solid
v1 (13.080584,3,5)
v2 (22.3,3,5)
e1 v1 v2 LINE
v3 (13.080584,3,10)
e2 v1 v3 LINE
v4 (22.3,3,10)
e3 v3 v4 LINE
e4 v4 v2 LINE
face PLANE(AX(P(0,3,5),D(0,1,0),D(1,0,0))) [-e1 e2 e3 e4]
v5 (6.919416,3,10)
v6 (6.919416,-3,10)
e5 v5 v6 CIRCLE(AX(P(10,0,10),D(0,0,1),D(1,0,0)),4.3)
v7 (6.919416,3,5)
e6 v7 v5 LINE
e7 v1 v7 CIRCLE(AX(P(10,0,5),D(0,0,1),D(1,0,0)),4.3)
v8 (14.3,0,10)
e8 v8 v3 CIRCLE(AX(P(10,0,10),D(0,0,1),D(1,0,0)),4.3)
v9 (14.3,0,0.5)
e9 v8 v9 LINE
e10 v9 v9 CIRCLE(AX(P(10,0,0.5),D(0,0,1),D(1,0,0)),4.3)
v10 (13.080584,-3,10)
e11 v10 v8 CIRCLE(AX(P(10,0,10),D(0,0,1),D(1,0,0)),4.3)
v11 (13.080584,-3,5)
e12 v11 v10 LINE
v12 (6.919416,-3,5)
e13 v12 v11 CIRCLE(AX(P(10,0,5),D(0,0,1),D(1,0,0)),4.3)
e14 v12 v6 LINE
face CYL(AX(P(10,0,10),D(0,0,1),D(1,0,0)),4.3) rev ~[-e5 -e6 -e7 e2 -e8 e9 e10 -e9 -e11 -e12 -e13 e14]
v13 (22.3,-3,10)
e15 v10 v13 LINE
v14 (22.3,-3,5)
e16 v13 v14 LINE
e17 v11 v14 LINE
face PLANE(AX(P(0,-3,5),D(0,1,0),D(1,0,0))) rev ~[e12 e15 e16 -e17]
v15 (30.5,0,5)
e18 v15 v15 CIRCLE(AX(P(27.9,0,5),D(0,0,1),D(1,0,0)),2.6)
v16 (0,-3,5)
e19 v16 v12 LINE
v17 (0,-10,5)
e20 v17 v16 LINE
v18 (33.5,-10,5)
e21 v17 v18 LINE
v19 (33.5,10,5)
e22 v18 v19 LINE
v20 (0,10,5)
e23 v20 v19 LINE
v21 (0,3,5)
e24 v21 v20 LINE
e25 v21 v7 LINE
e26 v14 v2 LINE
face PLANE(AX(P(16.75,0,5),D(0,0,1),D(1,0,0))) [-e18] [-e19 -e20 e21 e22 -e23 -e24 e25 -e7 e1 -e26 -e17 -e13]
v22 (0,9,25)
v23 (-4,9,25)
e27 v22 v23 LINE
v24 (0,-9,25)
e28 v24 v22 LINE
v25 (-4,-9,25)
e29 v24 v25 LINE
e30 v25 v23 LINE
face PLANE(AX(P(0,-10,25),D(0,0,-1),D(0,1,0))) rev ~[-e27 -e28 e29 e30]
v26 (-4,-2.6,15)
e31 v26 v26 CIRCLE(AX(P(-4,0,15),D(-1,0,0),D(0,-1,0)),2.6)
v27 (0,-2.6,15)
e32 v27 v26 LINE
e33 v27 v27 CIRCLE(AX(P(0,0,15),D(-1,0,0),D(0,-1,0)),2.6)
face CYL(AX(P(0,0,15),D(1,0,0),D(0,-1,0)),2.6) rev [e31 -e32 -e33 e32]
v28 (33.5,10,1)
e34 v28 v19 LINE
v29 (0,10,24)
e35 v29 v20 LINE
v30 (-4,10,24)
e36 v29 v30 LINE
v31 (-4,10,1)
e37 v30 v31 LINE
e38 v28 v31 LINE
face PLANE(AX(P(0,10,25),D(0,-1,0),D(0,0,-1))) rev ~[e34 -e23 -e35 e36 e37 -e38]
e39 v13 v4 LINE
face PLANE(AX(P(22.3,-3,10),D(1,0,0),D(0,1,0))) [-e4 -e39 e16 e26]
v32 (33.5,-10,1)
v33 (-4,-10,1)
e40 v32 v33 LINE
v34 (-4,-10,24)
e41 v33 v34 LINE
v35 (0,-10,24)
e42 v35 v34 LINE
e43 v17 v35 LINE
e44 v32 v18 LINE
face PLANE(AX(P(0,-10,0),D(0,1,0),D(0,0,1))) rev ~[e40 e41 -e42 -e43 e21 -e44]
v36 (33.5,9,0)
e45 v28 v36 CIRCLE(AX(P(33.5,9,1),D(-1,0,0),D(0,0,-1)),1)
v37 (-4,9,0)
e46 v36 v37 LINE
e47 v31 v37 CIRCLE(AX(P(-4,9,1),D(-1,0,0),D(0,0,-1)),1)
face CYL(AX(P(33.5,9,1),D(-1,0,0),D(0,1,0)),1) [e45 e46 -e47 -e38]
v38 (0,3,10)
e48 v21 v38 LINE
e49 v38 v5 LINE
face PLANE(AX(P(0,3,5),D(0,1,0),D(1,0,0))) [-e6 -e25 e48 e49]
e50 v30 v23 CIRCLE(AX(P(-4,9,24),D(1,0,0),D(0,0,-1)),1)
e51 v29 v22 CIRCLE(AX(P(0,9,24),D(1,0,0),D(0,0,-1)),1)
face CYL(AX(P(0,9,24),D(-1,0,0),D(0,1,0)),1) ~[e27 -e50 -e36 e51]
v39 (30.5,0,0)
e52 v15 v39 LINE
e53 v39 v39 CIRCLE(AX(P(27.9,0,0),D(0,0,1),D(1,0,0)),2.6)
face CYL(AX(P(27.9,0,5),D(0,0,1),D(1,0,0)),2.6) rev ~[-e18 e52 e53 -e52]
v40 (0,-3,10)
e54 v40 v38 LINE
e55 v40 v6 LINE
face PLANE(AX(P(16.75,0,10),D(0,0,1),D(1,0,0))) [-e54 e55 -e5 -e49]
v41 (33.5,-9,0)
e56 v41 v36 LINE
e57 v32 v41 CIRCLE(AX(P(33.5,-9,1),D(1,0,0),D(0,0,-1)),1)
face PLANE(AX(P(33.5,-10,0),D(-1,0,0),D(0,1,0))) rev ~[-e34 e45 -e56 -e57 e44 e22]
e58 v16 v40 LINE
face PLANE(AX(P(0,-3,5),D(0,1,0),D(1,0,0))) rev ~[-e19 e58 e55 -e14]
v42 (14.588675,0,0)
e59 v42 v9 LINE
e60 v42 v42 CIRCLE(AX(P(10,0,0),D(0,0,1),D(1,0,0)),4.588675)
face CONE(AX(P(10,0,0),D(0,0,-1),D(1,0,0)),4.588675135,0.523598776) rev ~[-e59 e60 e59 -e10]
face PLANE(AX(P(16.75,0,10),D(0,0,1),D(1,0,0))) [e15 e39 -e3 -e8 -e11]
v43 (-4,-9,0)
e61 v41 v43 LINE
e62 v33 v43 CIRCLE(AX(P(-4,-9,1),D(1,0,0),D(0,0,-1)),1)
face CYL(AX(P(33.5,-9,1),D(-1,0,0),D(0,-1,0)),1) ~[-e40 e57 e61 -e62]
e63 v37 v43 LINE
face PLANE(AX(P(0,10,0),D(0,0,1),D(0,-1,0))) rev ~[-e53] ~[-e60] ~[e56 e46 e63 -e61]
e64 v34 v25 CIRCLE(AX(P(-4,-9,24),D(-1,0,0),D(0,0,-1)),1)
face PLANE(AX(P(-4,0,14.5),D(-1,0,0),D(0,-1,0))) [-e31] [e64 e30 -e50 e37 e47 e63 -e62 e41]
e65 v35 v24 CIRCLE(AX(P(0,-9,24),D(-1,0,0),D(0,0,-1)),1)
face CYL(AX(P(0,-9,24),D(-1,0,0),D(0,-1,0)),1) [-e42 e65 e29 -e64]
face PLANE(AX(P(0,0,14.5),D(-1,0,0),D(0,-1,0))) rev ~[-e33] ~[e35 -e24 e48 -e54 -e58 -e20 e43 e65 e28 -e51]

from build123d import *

# Parameters (mm, degrees)
F0_W      = 33.5
F0_H      = 20
F1_DEPTH  = 5
F2_W      = 33.5
F2_H      = 6
F3_DEPTH  = 5
F4_R      = 4.3
F5_DEPTH  = 25
F6_W      = 11.2
F6_H      = 6
F7_DEPTH  = 5
F8_R      = 2.6
F9_DEPTH  = 5
F10_R     = 2.6
F11_DEPTH = 4
F12_R     = 1


# Not quite as in the source:
# - a fillet or chamfer that OpenCascade refuses, or shapes differently, is made with other operations: its cross-section is extruded or revolved along the edge and cut away or added
# - a feature names something its author has since deleted; it is built from what else it names


with BuildPart() as f1:
    # F0 (on Top) → F1 (new body)
    with BuildSketch(Plane.XY):
        with Locations((16.75, 0)):
            Rectangle(F0_W, F0_H)
    extrude(amount=F1_DEPTH)

    # F2 (on face) → F3 (join)
    with BuildSketch(Plane.XY.offset(5)):
        with Locations((16.75, 0)):
            Rectangle(F2_W, F2_H)
    extrude(amount=F3_DEPTH)

    # F4 (on face) → F5 (cut)
    with BuildSketch(Plane.XY.offset(10)):
        with Locations((10, 0)):
            Circle(F4_R)
    extrude(amount=-F5_DEPTH, mode=Mode.SUBTRACT)

    # F6 (on face) → F7 (cut, through all)
    with BuildSketch(Plane.XY.offset(10)):
        with Locations((27.9, 0)):
            Rectangle(F6_W, F6_H)
    extrude(amount=-F7_DEPTH, mode=Mode.SUBTRACT)

    # F8 (on face) → F9 (cut, through all)
    with BuildSketch(Plane.XY.offset(5)):
        with Locations((27.9, 0)):
            Circle(F8_R)
    extrude(amount=-F9_DEPTH, mode=Mode.SUBTRACT)

    # F10 (on face) → F11 (join)
    with BuildSketch(Plane(origin=(0, 0, 0), x_dir=(0, -1, 0), z_dir=(-1, 0, 0))):
        Polygon((-10, 25), (-10, 5), (-3, 5), (-3, 10), (3, 10), (3, 5), (10, 5), (10, 25), align=None)
        with Locations((0, 15)):
            Circle(F10_R, mode=Mode.SUBTRACT)
        Polygon((-10, 5), (-10, 0), (10, 0), (10, 5), (3, 5), (3, 10), (-3, 10), (-3, 5), align=None)
    extrude(amount=F11_DEPTH)

    # F12
    f12_edges = [f1.edges().sort_by_distance(p)[0] for p in [
        (-2, -10, 25),
        (-2, 10, 25),
        (14.75, -10, 0),
        (14.75, 10, 0),
    ]]
    fillet(f12_edges, radius=F12_R)

    # F13: chamfer of 0.5 x 0.2886751346 on 1 edges, made by hand

    # F13_s1 → F13_t2 (revolve, cut)
    with BuildSketch(Plane.XZ):
        Polygon((14.5886751346, 0), (14.3, 0.5), (14.3, 0), align=None)
    revolve(axis=Axis((10, 0, 0), (0, 0, 1)), mode=Mode.SUBTRACT)


solid = f1.part
